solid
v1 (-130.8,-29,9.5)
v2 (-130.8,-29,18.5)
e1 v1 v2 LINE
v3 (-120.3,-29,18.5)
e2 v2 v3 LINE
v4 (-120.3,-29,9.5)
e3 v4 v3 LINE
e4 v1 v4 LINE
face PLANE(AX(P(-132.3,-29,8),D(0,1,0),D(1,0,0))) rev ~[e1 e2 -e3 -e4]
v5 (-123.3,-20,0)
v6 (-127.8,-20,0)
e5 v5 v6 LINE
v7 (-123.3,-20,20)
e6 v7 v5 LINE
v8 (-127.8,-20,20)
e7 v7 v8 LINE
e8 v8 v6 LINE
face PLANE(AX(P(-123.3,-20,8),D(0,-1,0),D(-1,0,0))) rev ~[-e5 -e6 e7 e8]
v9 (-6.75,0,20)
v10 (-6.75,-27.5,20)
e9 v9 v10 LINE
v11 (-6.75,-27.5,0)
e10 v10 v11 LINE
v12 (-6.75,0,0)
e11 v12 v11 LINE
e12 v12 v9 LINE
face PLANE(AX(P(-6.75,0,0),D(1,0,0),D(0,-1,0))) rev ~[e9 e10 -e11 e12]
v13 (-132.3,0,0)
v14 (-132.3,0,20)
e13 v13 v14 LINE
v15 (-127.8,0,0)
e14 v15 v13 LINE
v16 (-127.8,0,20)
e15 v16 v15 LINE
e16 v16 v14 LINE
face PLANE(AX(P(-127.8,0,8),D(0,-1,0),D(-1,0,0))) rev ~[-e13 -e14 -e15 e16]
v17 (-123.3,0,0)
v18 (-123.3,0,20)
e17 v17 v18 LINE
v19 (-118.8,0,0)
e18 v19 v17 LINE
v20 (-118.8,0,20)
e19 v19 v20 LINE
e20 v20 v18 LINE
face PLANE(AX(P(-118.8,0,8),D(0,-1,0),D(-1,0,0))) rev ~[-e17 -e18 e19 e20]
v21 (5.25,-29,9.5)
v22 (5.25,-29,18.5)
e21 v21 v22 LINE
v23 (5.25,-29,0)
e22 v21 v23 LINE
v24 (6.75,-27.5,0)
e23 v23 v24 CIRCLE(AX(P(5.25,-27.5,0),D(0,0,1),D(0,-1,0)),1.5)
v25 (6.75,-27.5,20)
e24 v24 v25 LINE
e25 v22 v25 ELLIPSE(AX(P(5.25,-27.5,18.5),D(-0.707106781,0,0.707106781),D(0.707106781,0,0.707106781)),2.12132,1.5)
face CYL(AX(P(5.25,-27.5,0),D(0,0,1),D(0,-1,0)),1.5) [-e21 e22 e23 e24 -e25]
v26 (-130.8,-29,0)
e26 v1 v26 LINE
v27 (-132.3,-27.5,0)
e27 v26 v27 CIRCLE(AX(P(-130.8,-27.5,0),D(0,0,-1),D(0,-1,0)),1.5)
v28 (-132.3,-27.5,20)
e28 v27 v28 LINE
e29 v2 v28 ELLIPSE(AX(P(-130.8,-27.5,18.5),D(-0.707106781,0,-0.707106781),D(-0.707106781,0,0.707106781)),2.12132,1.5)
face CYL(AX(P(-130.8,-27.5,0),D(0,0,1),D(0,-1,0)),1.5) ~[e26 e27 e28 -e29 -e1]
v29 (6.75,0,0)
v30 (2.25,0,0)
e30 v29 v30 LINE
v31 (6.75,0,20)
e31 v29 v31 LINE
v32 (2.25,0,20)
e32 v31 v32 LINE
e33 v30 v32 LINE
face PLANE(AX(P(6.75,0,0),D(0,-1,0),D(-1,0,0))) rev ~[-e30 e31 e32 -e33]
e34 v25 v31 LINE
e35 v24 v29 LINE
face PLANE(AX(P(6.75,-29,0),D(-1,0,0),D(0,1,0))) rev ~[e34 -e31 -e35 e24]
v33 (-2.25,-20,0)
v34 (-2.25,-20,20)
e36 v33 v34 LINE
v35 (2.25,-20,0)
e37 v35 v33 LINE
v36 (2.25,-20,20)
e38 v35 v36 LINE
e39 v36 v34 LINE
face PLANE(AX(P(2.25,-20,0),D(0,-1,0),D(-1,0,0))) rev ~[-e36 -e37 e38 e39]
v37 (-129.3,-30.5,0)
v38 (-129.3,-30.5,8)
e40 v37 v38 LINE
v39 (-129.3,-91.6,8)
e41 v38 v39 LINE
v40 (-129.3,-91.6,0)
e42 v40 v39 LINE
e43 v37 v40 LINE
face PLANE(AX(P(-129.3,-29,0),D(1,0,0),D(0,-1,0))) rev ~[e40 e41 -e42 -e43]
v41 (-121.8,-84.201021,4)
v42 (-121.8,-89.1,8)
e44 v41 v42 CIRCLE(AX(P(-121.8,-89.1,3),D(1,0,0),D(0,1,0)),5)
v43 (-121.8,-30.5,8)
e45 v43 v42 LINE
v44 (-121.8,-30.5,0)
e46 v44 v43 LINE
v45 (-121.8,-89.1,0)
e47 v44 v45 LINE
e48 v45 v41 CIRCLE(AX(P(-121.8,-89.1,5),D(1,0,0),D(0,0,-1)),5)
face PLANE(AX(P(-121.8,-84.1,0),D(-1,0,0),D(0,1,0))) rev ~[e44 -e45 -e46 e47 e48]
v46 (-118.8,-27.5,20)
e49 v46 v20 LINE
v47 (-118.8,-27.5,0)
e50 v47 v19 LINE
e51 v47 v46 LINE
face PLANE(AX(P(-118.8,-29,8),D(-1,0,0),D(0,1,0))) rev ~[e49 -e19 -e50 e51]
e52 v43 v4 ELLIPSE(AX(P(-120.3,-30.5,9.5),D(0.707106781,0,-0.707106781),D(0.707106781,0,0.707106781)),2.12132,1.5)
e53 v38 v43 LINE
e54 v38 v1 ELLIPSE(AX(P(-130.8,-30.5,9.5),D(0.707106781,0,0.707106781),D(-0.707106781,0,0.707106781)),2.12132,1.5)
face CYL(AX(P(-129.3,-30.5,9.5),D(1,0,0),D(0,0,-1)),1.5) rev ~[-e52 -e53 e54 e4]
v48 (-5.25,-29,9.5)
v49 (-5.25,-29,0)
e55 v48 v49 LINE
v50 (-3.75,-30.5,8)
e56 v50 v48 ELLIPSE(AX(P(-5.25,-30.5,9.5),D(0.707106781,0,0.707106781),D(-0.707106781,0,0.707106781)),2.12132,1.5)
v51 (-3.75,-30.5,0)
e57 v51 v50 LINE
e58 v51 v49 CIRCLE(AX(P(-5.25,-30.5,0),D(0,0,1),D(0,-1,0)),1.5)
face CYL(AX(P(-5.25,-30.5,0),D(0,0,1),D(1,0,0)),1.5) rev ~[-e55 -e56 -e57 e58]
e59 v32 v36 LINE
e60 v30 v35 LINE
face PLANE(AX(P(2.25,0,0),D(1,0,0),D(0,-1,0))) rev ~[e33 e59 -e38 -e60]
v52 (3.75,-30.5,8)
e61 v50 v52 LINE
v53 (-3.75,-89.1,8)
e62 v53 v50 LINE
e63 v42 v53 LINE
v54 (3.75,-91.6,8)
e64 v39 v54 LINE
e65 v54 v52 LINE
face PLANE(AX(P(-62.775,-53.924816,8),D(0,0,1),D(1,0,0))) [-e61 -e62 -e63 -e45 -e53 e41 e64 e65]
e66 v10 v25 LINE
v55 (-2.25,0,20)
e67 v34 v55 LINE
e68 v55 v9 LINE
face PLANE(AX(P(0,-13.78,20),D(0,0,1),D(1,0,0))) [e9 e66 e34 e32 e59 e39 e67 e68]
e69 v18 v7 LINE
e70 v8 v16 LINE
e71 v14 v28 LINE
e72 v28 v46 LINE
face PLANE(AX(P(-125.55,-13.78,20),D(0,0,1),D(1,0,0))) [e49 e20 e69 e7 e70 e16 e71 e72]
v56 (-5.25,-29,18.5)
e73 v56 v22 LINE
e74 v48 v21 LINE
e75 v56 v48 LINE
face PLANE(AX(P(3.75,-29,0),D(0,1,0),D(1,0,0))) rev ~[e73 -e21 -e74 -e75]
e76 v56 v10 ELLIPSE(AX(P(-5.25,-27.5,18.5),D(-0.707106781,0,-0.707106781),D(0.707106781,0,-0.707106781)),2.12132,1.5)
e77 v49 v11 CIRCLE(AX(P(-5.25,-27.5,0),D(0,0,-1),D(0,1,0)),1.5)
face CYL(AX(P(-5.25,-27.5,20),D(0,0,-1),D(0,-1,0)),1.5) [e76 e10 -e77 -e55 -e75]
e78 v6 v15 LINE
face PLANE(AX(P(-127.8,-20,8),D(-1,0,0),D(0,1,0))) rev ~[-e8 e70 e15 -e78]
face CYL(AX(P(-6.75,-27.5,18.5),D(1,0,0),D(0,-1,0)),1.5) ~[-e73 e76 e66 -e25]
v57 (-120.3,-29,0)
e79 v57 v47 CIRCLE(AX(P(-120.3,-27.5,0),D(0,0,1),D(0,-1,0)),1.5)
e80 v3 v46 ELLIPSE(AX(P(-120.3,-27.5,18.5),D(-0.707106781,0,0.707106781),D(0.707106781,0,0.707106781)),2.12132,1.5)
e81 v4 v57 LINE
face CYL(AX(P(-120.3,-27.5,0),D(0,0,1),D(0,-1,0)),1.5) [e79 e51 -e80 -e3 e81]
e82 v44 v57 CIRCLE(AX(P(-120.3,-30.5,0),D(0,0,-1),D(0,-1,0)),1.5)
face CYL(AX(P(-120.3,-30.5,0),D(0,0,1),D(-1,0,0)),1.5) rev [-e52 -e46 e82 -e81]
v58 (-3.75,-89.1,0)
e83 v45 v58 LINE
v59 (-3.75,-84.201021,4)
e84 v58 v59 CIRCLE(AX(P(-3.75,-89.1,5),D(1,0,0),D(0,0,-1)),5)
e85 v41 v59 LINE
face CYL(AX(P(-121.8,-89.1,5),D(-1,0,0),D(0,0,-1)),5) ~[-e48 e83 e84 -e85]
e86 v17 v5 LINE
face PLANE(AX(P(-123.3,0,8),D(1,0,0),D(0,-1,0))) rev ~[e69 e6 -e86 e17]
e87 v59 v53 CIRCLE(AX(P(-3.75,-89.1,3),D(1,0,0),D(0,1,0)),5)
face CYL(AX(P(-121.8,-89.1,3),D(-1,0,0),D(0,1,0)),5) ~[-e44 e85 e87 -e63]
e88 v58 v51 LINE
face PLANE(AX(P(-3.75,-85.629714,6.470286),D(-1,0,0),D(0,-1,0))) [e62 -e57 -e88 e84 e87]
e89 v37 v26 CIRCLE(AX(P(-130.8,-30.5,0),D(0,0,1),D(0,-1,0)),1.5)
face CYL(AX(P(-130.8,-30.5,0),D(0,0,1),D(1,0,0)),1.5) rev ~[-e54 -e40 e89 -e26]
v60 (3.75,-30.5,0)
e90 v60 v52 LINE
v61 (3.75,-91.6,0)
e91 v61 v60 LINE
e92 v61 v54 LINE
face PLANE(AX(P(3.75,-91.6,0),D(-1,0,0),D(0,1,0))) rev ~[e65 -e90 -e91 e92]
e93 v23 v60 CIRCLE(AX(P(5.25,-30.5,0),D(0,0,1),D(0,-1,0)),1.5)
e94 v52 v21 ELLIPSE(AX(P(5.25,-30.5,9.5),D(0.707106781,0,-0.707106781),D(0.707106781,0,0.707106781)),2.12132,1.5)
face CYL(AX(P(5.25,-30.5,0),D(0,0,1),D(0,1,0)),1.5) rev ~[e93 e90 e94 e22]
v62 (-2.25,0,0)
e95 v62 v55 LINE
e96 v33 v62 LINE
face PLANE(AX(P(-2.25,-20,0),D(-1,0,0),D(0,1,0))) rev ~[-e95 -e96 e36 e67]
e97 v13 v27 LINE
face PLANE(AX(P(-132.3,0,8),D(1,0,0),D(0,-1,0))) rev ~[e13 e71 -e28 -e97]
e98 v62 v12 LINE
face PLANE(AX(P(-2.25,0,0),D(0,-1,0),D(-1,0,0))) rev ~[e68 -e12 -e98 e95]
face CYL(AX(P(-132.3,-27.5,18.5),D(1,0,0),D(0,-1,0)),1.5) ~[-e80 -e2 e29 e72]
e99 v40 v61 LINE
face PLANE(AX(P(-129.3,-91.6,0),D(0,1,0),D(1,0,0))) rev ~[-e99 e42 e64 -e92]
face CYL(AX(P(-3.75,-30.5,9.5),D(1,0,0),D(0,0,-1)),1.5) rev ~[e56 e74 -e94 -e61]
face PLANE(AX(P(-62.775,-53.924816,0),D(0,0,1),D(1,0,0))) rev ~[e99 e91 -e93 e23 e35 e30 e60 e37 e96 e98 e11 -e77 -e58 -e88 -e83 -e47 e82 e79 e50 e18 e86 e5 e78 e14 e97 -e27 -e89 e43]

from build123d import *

# Parameters (mm, degrees)
F1_DEPTH    = 8
F3_DEPTH    = 12
F4_R        = 1.5
F5_R        = 1.5
F6_T1_DEPTH = 118.05


# Not quite as in the source:
# - a fillet or chamfer that OpenCascade refuses, or shapes differently, is made with other operations: its cross-section is extruded or revolved along the edge and cut away or added


with BuildPart() as f1:
    # F0 (on Top) → F1 (new body)
    with BuildSketch(Plane.XY):
        Polygon((-127.8, 0), (-132.3, 0), (-132.3, -29), (-129.3, -29), (-129.3, -91.6), (3.75, -91.6), (3.75, -29), (6.75, -29), (6.75, 0), (2.25, 0), (2.25, -20), (-2.25, -20), (-2.25, 0), (-6.75, 0), (-6.75, -29), (-3.75, -29), (-3.75, -84.1), (-121.8, -84.1), (-121.8, -29), (-118.8, -29), (-118.8, 0), (-123.3, 0), (-123.3, -20), (-127.8, -20), align=None)
    extrude(amount=F1_DEPTH)

    # F2 (on face) → F3 (join)
    with BuildSketch(Plane.XY.offset(8)):
        Polygon((-127.8, 0), (-132.3, 0), (-132.3, -29), (-118.8, -29), (-118.8, 0), (-123.3, 0), (-123.3, -20), (-127.8, -20), align=None)
        Polygon((-2.25, 0), (-6.75, 0), (-6.75, -29), (6.75, -29), (6.75, 0), (2.25, 0), (2.25, -20), (-2.25, -20), align=None)
    extrude(amount=F3_DEPTH)

    # F4
    f4_edges = [f1.edges().sort_by_distance(p)[0] for p in [
        (-129.3, -29, 4),
        (-125.55, -29, 8),
        (-121.8, -29, 4),
        (-3.75, -29, 4),
        (0, -29, 8),
        (3.75, -29, 4),
    ]]
    fillet(f4_edges, radius=F4_R)

    # F5
    f5_edges = [f1.edges().sort_by_distance(p)[0] for p in [
        (-132.3, -29, 10),
        (-125.55, -29, 20),
        (-118.8, -29, 10),
        (6.75, -29, 10),
        (0, -29, 20),
        (-6.75, -29, 10),
    ]]
    fillet(f5_edges, radius=F5_R)

    # F6: fillet of radius 5 on 2 edges, made by hand

    # F6_s2 → F6_t1 (cut)
    with BuildSketch(Plane.YZ.offset(-121.8)):
        with BuildLine():
            ThreePointArc((-84.1, 3), (-85.5644660941, 6.5355339059), (-89.1, 8))
            Line((-89.1, 8), (-84.1, 8))
            Line((-84.1, 8), (-84.1, 3))
        make_face()
        with BuildLine():
            ThreePointArc((-89.1, 0), (-85.5644660941, 1.4644660941), (-84.1, 5))
            Line((-84.1, 5), (-84.1, 0))
            Line((-84.1, 0), (-89.1, 0))
        make_face()
    extrude(amount=F6_T1_DEPTH, mode=Mode.SUBTRACT)


solid = f1.part
